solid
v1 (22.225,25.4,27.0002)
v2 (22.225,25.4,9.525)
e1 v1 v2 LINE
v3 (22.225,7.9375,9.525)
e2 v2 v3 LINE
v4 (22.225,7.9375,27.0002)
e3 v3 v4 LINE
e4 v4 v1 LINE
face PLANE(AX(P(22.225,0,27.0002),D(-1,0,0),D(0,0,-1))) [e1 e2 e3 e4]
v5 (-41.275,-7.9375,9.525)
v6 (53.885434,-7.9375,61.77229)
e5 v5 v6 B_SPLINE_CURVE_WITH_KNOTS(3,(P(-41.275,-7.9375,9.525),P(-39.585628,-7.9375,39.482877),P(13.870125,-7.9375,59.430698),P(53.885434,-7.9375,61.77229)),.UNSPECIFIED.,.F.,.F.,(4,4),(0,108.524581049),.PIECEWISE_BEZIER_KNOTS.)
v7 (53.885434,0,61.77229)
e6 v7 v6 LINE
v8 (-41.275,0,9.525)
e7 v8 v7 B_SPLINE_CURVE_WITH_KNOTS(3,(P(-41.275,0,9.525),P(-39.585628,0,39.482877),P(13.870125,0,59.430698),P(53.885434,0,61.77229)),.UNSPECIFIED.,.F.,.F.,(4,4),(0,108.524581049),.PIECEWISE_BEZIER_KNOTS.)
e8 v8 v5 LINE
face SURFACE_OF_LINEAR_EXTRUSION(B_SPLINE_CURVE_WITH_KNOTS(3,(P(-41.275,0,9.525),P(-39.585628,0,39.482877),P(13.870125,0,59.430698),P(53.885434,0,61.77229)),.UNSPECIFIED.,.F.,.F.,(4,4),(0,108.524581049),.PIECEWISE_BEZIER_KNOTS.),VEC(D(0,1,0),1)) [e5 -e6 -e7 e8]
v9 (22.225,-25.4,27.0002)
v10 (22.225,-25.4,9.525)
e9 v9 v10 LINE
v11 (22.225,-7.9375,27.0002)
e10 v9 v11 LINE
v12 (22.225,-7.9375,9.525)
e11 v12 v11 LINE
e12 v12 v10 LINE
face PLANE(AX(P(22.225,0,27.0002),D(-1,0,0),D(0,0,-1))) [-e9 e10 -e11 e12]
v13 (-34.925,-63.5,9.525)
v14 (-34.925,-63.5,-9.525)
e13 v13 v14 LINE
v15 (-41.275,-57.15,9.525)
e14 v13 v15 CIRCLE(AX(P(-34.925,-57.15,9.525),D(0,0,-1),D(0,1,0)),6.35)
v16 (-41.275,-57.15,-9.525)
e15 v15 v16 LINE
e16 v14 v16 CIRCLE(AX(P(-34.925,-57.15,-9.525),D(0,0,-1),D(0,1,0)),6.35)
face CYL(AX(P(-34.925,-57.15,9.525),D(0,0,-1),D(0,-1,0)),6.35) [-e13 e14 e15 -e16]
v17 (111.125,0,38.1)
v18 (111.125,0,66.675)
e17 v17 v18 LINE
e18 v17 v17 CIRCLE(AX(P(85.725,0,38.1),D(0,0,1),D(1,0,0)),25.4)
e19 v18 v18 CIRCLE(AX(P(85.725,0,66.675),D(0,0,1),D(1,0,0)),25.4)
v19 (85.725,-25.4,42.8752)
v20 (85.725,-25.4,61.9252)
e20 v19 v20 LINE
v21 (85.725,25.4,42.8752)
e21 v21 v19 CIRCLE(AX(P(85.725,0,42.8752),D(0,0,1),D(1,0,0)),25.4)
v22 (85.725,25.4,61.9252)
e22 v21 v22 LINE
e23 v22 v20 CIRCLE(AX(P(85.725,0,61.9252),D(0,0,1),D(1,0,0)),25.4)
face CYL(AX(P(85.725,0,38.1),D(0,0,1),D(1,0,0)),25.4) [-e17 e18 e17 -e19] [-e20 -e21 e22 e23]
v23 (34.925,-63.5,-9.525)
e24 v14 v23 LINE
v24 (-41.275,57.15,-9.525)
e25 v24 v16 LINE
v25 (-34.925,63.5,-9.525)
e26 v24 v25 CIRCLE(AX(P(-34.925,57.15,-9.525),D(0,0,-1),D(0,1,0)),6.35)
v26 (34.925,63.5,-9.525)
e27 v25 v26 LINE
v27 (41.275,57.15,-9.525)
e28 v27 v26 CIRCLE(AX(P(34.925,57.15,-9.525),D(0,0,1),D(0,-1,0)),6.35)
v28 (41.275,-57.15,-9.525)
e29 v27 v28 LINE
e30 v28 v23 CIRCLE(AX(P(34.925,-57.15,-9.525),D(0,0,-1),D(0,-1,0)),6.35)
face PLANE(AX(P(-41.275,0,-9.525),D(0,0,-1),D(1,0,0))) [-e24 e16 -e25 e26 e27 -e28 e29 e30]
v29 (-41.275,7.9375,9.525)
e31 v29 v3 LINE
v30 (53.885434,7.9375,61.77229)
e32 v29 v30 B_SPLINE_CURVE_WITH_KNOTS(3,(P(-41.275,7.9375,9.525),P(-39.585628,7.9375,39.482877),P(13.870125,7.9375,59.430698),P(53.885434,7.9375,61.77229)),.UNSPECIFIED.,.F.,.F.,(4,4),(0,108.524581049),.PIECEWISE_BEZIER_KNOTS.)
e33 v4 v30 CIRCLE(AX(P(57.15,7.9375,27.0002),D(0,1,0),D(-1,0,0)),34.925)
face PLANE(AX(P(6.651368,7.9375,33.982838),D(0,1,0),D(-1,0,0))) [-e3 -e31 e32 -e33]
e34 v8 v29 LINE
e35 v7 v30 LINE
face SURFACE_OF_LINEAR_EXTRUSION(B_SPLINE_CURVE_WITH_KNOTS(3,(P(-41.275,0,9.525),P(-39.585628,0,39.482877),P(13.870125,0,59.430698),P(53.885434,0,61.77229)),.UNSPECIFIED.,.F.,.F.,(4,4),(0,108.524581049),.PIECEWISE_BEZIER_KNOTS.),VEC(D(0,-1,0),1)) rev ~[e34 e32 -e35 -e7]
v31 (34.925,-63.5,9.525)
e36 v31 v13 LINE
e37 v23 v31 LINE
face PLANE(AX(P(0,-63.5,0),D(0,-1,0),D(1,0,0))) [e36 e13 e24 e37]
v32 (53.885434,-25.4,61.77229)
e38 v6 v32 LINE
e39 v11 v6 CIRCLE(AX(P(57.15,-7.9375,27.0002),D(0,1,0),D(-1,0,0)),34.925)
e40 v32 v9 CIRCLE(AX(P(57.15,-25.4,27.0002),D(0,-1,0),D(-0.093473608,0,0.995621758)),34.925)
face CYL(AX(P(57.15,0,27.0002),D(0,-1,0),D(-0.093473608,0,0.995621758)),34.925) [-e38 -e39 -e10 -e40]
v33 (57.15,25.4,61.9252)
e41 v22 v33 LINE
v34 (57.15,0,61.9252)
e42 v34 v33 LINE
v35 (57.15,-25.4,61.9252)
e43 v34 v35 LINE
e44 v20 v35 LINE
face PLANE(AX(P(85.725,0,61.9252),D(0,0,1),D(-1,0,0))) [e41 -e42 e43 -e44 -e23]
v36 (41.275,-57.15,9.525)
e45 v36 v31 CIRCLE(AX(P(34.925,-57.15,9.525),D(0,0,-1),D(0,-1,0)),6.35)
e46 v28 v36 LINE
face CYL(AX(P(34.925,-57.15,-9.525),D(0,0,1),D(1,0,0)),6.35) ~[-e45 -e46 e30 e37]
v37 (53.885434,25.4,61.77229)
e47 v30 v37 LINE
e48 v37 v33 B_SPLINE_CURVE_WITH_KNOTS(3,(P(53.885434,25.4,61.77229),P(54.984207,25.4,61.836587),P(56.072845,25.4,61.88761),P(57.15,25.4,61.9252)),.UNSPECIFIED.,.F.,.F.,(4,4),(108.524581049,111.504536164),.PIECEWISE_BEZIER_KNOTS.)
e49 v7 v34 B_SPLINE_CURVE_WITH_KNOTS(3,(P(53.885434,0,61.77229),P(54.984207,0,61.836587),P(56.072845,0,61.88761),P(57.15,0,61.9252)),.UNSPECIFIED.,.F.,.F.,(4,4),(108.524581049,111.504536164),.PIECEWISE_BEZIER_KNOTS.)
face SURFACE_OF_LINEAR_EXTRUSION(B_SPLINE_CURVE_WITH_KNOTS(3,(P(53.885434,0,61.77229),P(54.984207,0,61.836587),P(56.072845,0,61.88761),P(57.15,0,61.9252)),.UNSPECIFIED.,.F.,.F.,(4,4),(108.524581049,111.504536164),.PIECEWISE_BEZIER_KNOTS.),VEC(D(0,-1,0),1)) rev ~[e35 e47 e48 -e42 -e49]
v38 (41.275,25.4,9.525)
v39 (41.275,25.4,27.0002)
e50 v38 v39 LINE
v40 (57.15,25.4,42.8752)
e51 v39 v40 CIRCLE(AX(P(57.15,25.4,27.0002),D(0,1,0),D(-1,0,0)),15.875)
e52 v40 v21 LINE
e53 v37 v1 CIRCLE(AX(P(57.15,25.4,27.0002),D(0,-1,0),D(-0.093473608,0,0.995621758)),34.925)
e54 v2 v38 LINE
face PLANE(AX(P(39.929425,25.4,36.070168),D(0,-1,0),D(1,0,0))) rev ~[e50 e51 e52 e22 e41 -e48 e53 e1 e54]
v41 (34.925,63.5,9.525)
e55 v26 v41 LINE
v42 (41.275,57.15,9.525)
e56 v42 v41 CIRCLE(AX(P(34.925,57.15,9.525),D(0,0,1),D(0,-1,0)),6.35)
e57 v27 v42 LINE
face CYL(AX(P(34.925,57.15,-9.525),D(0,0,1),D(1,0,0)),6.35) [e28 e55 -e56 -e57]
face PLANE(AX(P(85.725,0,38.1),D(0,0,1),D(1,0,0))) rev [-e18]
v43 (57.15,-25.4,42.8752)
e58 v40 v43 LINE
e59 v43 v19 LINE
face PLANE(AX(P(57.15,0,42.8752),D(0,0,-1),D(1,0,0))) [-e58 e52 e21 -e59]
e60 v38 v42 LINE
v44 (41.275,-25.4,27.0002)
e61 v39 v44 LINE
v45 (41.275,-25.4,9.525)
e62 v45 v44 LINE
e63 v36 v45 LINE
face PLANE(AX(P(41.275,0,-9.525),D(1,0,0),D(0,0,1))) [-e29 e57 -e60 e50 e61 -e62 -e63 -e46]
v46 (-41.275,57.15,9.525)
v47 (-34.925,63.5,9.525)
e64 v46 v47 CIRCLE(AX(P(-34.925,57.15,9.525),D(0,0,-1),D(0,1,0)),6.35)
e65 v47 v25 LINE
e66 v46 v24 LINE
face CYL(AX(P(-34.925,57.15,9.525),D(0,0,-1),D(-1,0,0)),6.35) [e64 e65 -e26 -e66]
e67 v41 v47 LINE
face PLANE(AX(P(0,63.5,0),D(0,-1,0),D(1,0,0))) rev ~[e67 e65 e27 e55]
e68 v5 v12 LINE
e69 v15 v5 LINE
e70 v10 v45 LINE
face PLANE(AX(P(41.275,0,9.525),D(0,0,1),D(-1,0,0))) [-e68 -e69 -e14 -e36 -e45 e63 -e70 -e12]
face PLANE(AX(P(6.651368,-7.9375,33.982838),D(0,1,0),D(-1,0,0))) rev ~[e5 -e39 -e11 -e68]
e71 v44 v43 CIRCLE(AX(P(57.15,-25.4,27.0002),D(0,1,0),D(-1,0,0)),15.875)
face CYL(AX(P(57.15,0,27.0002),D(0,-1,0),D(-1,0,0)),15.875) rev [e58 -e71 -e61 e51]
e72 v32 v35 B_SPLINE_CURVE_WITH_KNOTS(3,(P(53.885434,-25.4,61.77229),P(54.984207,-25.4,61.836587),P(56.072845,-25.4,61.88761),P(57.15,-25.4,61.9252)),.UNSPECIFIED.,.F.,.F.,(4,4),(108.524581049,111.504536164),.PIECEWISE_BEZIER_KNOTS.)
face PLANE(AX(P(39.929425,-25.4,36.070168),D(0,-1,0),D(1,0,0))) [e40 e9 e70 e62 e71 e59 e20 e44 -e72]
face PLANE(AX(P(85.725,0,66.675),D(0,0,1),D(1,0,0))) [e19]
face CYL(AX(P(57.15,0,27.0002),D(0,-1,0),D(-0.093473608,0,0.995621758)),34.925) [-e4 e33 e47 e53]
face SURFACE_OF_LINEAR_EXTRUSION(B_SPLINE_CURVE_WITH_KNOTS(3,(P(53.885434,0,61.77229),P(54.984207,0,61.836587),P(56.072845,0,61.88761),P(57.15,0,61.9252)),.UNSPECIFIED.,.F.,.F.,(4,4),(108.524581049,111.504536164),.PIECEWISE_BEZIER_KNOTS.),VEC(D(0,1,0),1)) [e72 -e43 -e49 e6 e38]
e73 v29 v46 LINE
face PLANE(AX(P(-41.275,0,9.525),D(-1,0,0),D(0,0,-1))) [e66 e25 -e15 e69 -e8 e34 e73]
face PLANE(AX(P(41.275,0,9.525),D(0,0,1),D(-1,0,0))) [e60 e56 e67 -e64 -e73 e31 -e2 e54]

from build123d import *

# Parameters (mm, degrees)
F1_DEPTH = 63.5
F0_W     = 25.4
F0_H     = 19.05
F2_DEPTH = 25.4
F3_DEPTH = 7.9375
F5_R     = 6.35


# Not quite as in the source:
# - a feature of the source that left no trace in its solid (it failed there, or was rolled back) is left out


with BuildPart() as f1:
    # F0 (on Front) → F1 (new body, symmetric)
    with BuildSketch(Plane.XZ):
        Polygon((22.225, 9.525), (-41.275, 9.525), (-41.275, -9.525), (41.275, -9.525), (41.275, 9.525), align=None)
    extrude(amount=F1_DEPTH, both=True)

    # F0 (on Front) → F2 (join, symmetric)
    with BuildSketch(Plane.XZ):
        with BuildLine():
            Line((22.225, 27.0002), (22.225, 9.525))
            Line((22.225, 9.525), (41.275, 9.525))
            Line((41.275, 9.525), (41.275, 27.0002))
            ThreePointArc((41.275, 27.0002), (45.9246798487, 38.2255201513), (57.15, 42.8752))
            Line((57.15, 42.8752), (60.325, 42.8752))
            Line((60.325, 42.8752), (60.325, 61.9252))
            Line((60.325, 61.9252), (57.15, 61.9252))
            add(Edge.make_bspline(
                [(53.8854342407, 61.7722898912), (54.9842067368, 61.8365871986), (56.0728453275, 61.8876096574), (57.15, 61.9252)],
                knots=[108.5245810491, 108.5245810491, 108.5245810491, 108.5245810491, 111.5045361635, 111.5045361635, 111.5045361635, 111.5045361635], degree=3))
            ThreePointArc((53.8854342407, 61.7722898912), (31.3258777096, 50.5133948686), (22.225, 27.0002))
        make_face()
        with Locations((73.025, 52.4002)):
            Rectangle(F0_W, F0_H)
    extrude(amount=F2_DEPTH, both=True)

    # F0 (on Front) → F3 (join, symmetric)
    with BuildSketch(Plane.XZ):
        with BuildLine():
            add(Edge.make_bspline(
                [(-41.275, 9.525), (-39.5856284224, 39.4828766469), (13.870125209, 59.4306981306), (53.8854342407, 61.7722898912)],
                knots=[0, 0, 0, 0, 108.5245810491, 108.5245810491, 108.5245810491, 108.5245810491], degree=3))
            Line((-41.275, 9.525), (22.225, 9.525))
            Line((22.225, 9.525), (22.225, 27.0002))
            ThreePointArc((22.225, 27.0002), (31.3258777096, 50.5133948686), (53.8854342407, 61.7722898912))
        make_face()
    extrude(amount=F3_DEPTH, both=True)

    # F0 (on Front) → F4 (revolve)
    with BuildSketch(Plane.XZ):
        Polygon((85.725, 66.675), (85.725, 61.9252), (85.725, 42.8752), (85.725, 38.1), (111.125, 38.1), (111.125, 66.675), align=None)
    revolve(axis=Axis((85.725, 0, 52.3875), (0, 0, 1)))

    # F5
    f5_edges = [f1.edges().sort_by_distance(p)[0] for p in [
        (-41.275, -63.5, 0),
        (41.275, -63.5, 0),
        (-41.275, 63.5, 0),
        (41.275, 63.5, 0),
    ]]
    fillet(f5_edges, radius=F5_R)


solid = f1.part
